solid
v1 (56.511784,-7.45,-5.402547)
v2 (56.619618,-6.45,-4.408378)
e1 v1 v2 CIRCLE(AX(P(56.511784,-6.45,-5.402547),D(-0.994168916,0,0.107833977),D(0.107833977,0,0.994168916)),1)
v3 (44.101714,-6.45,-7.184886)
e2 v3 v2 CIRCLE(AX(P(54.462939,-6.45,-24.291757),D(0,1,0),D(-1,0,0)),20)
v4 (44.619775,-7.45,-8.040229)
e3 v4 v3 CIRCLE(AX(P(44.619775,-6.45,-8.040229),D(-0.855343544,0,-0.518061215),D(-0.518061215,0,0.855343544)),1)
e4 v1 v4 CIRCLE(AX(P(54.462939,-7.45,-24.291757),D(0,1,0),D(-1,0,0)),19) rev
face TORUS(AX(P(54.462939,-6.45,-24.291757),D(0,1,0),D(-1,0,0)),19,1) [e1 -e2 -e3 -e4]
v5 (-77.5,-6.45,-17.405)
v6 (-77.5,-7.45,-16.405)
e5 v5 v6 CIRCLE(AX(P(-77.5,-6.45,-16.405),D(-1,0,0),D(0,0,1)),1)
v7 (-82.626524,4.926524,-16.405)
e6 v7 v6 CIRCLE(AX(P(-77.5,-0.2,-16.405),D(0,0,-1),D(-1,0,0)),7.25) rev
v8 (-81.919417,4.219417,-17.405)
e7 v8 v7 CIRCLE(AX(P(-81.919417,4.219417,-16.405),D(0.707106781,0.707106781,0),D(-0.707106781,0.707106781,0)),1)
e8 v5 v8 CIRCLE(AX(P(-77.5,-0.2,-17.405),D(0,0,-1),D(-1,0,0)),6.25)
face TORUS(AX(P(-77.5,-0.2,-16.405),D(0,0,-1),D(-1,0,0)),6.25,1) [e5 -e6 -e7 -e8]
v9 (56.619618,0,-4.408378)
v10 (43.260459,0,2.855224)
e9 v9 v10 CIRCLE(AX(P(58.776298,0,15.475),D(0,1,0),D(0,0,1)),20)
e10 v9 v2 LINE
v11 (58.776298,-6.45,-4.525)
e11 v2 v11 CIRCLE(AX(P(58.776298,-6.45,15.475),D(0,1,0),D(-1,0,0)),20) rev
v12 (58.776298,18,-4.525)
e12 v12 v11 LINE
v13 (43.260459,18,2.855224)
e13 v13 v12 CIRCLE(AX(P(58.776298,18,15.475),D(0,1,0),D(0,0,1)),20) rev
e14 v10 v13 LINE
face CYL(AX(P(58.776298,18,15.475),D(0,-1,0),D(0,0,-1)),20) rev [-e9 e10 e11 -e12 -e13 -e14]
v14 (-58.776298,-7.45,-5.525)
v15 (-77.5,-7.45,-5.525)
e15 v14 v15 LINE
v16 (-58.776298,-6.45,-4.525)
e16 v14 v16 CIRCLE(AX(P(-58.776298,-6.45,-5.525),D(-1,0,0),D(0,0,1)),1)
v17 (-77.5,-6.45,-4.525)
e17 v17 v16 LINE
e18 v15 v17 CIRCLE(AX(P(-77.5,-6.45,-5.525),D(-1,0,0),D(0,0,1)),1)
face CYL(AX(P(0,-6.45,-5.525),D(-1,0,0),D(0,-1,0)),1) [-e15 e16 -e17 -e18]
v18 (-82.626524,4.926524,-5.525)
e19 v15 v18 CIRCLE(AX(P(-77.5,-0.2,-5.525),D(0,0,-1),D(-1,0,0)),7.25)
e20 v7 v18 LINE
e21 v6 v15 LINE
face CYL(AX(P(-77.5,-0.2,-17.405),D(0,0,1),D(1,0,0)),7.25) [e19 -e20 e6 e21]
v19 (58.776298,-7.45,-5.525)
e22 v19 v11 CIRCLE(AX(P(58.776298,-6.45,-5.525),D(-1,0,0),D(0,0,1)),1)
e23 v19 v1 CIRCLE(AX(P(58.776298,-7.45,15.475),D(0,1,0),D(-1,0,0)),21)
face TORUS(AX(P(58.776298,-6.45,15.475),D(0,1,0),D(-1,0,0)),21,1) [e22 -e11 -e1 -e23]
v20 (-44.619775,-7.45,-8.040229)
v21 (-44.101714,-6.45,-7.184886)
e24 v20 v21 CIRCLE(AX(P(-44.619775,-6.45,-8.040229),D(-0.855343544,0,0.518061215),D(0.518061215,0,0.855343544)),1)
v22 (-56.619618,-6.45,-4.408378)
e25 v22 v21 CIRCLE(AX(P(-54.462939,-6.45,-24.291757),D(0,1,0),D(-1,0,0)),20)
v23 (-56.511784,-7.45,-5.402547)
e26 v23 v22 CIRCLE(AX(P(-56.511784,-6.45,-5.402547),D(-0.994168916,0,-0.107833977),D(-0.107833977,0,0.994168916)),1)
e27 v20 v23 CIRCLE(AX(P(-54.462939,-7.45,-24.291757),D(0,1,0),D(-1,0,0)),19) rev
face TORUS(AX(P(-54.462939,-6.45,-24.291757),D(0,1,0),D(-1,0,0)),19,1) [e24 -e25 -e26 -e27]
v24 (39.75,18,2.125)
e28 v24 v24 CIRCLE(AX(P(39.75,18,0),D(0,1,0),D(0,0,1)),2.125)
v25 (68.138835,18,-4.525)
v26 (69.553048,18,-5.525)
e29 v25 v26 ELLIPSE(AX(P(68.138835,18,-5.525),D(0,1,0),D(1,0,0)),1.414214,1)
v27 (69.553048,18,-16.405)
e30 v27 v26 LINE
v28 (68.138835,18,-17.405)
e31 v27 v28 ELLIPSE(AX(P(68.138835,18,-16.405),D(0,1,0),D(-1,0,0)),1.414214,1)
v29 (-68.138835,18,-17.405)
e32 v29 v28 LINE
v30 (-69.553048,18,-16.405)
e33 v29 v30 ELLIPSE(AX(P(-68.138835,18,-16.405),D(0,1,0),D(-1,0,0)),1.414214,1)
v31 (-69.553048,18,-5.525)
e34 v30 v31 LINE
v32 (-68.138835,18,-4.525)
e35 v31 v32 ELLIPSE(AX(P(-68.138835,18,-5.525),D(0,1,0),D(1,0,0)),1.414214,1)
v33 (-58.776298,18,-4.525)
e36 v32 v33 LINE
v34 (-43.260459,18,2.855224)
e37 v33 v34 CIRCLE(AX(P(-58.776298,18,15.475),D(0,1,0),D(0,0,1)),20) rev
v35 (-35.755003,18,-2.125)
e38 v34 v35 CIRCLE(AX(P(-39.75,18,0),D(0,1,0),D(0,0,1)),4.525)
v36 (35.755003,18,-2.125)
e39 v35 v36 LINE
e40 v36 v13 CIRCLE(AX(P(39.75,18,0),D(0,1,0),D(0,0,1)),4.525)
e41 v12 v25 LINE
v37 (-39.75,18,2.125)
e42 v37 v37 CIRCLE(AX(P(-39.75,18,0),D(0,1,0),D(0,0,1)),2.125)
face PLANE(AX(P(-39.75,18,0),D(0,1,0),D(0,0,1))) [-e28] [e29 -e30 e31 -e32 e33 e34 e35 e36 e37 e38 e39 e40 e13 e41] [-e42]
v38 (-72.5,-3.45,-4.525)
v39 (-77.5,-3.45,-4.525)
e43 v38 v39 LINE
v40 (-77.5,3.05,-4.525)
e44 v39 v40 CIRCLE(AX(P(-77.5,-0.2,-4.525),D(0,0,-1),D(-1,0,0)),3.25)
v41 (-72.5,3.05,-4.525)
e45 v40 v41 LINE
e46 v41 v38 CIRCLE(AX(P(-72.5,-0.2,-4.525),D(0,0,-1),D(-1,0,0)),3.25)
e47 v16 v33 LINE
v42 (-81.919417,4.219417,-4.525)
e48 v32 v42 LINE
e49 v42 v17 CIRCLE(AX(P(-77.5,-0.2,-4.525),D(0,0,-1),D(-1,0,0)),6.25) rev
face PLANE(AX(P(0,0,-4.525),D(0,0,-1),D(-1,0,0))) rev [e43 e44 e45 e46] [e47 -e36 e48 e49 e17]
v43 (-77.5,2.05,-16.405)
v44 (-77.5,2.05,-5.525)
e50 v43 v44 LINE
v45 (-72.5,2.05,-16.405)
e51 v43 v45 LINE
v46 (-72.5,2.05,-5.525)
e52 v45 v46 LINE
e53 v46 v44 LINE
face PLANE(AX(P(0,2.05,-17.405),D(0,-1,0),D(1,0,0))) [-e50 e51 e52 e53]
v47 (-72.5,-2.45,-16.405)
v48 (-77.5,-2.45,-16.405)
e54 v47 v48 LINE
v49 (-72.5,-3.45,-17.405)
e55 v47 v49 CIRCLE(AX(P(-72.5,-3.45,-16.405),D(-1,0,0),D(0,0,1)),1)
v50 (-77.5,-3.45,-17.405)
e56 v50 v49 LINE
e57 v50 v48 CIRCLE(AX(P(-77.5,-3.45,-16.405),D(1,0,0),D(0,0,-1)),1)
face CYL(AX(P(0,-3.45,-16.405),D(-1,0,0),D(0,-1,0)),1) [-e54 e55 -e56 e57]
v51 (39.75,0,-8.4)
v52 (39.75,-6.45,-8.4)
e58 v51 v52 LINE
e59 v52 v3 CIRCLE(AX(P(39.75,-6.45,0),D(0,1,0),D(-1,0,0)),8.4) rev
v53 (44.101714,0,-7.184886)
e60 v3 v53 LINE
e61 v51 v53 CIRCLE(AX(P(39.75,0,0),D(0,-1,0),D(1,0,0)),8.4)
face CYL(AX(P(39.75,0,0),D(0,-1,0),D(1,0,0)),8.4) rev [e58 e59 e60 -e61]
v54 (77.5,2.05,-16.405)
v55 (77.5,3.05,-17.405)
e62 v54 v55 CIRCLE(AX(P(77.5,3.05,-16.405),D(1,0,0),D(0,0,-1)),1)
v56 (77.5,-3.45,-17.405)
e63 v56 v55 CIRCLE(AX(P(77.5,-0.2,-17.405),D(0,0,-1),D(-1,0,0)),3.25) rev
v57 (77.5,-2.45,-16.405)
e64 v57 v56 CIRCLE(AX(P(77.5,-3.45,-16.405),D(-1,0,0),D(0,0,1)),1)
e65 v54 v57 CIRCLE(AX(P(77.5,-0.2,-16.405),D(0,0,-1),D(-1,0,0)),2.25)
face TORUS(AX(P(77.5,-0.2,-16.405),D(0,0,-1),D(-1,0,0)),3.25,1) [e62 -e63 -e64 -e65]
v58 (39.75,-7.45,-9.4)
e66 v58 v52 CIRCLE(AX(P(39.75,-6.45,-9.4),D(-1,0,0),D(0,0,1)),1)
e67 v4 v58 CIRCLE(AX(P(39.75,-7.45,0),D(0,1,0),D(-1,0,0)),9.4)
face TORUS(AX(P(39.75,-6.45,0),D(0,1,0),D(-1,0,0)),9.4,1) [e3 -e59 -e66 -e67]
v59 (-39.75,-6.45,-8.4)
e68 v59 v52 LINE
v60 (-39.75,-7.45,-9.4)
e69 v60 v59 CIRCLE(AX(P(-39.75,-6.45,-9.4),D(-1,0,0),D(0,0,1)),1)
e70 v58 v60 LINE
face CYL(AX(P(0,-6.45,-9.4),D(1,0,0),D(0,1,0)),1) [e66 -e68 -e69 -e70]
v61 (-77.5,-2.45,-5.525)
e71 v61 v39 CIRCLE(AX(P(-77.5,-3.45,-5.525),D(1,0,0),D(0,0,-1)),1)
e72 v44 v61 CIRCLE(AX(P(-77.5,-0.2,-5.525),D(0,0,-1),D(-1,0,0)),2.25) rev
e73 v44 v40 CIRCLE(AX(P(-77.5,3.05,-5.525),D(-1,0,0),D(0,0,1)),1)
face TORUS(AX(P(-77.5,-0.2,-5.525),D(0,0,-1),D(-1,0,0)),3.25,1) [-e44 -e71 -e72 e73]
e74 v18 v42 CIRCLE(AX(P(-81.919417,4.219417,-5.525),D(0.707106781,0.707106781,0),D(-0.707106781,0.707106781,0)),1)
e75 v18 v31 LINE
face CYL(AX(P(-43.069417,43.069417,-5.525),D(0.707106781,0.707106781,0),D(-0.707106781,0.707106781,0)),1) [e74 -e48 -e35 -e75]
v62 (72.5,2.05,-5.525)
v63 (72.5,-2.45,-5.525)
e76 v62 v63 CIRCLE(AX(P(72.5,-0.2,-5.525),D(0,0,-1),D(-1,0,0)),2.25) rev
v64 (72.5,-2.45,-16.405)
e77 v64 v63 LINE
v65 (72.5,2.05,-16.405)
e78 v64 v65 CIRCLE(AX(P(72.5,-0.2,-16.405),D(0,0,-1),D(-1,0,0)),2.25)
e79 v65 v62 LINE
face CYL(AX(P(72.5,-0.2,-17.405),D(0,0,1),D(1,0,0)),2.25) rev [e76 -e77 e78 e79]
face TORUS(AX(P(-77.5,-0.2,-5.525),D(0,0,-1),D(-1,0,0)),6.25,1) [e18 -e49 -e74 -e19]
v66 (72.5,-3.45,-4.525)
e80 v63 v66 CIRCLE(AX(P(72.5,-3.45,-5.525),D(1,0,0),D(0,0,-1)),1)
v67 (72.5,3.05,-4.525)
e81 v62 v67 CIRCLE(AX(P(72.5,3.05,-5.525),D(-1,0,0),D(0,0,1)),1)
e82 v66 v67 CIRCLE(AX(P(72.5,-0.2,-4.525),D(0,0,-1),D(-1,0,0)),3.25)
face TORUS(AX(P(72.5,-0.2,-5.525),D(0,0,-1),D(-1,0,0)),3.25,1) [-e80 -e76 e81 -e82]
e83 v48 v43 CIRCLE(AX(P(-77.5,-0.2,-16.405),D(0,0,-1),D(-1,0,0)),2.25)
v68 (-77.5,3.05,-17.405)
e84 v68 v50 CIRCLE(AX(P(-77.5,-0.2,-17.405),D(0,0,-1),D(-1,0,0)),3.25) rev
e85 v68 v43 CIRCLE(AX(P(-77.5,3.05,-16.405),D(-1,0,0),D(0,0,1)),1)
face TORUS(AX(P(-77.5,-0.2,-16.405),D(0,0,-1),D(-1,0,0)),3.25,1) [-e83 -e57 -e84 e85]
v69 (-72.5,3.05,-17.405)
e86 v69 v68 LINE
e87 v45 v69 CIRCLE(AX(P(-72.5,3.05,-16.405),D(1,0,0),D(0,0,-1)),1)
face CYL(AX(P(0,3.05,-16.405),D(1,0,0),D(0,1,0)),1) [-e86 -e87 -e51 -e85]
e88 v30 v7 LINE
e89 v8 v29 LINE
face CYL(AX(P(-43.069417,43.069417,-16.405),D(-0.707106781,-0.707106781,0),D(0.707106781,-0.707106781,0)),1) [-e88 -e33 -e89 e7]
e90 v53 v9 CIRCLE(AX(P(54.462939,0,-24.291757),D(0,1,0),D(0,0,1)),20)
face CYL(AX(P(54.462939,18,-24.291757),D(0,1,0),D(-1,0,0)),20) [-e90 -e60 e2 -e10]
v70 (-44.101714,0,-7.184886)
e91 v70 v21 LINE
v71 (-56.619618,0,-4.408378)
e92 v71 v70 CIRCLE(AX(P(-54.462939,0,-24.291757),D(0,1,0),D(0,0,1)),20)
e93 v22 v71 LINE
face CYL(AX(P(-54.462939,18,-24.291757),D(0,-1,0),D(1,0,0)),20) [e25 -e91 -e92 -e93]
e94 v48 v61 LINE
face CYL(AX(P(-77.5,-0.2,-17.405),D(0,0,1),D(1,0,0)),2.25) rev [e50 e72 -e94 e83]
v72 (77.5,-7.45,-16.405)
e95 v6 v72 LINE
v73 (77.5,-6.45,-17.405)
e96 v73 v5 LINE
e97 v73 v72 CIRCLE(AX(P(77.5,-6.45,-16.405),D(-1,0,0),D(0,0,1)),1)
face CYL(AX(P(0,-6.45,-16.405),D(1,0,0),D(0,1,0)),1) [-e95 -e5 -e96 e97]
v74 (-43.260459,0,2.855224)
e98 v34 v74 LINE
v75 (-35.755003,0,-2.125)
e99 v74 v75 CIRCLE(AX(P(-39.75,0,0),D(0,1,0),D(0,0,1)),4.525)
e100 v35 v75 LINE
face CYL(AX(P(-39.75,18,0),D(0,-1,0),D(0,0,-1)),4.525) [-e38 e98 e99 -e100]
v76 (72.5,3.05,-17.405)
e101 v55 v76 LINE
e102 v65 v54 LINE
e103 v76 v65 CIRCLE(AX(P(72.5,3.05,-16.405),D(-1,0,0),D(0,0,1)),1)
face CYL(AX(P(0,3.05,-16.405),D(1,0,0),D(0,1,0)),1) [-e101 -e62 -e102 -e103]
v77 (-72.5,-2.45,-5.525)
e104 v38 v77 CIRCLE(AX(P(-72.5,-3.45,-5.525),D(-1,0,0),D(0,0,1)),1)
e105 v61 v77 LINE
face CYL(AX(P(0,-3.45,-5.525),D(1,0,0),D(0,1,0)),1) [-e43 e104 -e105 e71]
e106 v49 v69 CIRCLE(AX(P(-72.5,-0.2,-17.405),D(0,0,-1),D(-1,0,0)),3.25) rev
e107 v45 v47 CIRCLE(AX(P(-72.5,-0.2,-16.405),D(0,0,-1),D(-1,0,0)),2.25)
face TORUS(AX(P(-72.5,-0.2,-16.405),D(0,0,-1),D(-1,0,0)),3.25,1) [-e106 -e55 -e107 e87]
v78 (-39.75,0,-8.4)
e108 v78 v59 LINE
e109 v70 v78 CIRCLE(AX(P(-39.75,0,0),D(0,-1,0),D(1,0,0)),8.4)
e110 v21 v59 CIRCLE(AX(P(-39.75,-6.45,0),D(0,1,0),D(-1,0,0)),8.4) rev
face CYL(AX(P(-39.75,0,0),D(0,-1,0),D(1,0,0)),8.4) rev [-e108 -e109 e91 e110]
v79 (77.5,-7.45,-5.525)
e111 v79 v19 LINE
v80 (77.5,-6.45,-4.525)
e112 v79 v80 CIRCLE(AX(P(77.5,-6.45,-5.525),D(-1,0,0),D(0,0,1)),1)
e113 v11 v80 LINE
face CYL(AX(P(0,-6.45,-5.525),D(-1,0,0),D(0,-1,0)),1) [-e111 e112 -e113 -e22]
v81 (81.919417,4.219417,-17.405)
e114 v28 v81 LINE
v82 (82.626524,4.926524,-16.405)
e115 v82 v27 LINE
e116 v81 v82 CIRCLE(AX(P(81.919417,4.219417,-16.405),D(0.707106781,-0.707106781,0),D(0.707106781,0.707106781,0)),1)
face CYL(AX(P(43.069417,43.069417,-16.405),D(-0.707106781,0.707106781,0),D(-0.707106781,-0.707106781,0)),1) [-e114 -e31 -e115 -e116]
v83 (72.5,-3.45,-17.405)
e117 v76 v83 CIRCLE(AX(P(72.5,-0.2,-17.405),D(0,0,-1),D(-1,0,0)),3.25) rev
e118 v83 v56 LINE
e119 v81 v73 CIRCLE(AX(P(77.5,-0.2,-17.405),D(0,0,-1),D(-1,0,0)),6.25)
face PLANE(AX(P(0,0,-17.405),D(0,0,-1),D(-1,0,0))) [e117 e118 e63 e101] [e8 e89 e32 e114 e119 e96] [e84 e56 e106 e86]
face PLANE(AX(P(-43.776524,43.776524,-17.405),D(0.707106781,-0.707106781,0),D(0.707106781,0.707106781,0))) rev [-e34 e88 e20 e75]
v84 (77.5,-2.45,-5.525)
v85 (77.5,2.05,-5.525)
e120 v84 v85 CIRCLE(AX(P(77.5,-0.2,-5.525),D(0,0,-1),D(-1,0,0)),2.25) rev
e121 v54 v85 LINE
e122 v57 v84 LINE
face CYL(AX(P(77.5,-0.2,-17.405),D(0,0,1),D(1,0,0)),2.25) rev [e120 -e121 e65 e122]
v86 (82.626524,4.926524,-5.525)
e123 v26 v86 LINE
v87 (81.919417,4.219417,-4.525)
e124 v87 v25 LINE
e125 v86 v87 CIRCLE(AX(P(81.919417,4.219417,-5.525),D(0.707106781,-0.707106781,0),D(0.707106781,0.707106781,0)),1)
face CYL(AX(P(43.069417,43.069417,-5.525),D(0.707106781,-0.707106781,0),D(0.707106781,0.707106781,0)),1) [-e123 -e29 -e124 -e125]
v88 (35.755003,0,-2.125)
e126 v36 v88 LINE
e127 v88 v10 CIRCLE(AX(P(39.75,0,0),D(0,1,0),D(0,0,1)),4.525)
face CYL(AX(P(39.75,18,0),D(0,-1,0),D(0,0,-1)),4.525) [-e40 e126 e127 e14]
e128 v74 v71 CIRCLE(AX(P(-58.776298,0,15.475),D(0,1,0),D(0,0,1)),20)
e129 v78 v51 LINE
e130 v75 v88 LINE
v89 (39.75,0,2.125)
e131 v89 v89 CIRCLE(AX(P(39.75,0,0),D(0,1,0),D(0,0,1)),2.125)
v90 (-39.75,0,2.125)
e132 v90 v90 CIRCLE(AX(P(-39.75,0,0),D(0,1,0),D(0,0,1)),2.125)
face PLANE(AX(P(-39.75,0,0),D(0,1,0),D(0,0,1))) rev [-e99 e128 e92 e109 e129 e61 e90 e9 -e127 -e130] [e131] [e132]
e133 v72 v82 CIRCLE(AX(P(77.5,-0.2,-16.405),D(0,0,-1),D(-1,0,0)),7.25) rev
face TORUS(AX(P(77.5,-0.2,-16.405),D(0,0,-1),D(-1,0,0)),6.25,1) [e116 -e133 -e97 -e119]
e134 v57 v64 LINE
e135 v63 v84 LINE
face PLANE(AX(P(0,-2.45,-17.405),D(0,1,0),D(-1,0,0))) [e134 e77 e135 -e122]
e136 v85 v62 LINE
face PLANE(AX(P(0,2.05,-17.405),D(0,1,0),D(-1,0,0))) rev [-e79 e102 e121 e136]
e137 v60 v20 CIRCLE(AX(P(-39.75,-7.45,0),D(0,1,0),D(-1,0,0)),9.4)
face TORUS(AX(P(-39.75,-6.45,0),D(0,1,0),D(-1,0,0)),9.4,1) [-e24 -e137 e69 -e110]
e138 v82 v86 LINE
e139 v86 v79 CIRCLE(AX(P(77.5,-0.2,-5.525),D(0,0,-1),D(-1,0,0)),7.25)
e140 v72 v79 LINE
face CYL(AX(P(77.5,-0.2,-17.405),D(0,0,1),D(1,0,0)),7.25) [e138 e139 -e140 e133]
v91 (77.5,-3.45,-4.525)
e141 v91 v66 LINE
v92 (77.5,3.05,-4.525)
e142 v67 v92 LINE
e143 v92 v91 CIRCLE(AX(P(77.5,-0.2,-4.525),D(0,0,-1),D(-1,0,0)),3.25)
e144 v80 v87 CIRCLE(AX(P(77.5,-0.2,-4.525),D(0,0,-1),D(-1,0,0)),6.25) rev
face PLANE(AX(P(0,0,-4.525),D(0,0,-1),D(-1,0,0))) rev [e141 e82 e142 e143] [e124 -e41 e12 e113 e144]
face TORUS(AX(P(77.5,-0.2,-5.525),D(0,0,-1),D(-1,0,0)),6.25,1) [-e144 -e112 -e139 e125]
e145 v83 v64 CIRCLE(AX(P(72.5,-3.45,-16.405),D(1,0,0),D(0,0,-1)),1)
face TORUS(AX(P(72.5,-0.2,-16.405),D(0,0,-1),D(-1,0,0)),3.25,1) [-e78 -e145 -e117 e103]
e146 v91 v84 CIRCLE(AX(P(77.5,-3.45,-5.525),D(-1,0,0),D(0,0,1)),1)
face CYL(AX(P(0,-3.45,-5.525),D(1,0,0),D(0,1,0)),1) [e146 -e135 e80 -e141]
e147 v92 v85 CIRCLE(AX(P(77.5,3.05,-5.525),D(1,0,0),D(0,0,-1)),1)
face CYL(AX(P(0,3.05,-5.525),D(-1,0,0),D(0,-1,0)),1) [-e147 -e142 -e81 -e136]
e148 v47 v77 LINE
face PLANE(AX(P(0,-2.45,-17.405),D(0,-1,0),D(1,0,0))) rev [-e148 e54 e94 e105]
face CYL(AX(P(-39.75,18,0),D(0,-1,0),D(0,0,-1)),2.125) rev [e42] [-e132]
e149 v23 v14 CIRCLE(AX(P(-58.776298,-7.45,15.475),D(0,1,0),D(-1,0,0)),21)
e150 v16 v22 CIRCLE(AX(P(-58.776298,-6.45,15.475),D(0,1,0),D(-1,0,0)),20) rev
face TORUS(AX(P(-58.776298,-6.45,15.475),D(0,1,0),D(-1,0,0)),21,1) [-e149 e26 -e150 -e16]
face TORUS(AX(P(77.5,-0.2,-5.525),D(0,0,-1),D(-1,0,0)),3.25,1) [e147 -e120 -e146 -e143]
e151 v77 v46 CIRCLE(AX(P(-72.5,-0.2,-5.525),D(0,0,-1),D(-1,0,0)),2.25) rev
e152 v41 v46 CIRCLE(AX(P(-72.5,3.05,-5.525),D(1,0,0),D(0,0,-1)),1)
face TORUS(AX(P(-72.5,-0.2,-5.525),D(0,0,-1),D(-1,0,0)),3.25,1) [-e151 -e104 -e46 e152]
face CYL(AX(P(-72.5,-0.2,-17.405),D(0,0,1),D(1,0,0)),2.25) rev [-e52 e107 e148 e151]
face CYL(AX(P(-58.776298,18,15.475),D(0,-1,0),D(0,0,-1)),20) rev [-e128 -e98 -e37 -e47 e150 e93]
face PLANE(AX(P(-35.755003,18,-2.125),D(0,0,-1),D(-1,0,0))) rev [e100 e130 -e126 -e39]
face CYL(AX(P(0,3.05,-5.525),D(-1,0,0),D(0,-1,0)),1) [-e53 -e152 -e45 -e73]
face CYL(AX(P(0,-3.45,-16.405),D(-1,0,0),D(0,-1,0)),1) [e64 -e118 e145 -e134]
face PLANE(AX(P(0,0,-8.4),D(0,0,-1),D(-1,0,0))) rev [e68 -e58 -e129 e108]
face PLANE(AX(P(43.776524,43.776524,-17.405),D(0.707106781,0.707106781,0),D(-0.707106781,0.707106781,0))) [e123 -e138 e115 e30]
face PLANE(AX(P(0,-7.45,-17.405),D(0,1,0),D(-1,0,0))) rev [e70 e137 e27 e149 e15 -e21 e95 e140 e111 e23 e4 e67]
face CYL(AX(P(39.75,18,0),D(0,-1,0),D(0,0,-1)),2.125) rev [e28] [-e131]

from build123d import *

# Parameters (mm, degrees)
SKETCH1_R                 = 2.125
MAIN_DEPTH                = 18
POWE_SUPPLY_MOUNT_DEPTH   = 12.88
BOTTOM_PLATE_CAVITY_DEPTH = 7.45
FILLET1_DEPTH             = 18
FILLET1_START             = -7.45
FILLET1_2_DEPTH           = 9.35116
FILLET2_R                 = 20
FILLET3_R                 = 1


with BuildPart() as part:
    # Sketch1 → Main (new body)
    with BuildSketch(Plane(origin=(0, 0, 0), x_dir=(1, 0, 0), z_dir=(0, 1, 0))):
        with BuildLine():
            Line((-39.75, 4.525), (39.75, 4.525))
            ThreePointArc((39.75, 4.525), (42.08023604, -3.878869036), (35.755003129, 2.125))
            Line((35.755003129, 2.125), (-35.755003129, 2.125))
            ThreePointArc((-35.755003129, 2.125), (-42.08023604, -3.878869036), (-39.75, 4.525))
        make_face()
        with Locations(Location((-39.75, 0, 0), (0, 0, 270))):
            Circle(SKETCH1_R, mode=Mode.SUBTRACT)
        with Locations(Location((39.75, 0, 0), (0, 0, 270))):
            Circle(SKETCH1_R, mode=Mode.SUBTRACT)
    extrude(amount=MAIN_DEPTH)

    # Sketch2 → Powe Supply Mount (add)
    with BuildSketch(Plane(origin=(0, 0, -4.525), x_dir=(-1, 0, 0), z_dir=(0, 0, -1))):
        with BuildLine():
            Line((-69.553048327, 18), (-82.626524164, 4.926524164))
            ThreePointArc((-82.626524164, 4.926524164), (-84.198126611, -2.974454885), (-77.5, -7.45))
            Line((-77.5, -7.45), (77.5, -7.45))
            ThreePointArc((77.5, -7.45), (84.198126611, -2.974454885), (82.626524164, 4.926524164))
            Line((82.626524164, 4.926524164), (69.553048327, 18))
            Line((69.553048327, 18), (-69.553048327, 18))
        make_face()
        with BuildLine():
            Line((77.5, -2.45), (72.5, -2.45))
            ThreePointArc((72.5, -2.45), (70.25, -0.2), (72.5, 2.05))
            Line((72.5, 2.05), (77.5, 2.05))
            ThreePointArc((77.5, 2.05), (79.75, -0.2), (77.5, -2.45))
        make_face(mode=Mode.SUBTRACT)
        with BuildLine():
            ThreePointArc((-77.5, -2.45), (-79.75, -0.2), (-77.5, 2.05))
            Line((-77.5, 2.05), (-72.5, 2.05))
            ThreePointArc((-72.5, 2.05), (-70.25, -0.2), (-72.5, -2.45))
            Line((-72.5, -2.45), (-77.5, -2.45))
        make_face(mode=Mode.SUBTRACT)
    extrude(amount=POWE_SUPPLY_MOUNT_DEPTH)

    # Sketch4 → Bottom Plate Cavity (cut)
    with BuildSketch(Plane.XZ.offset(7.45)):
        with BuildLine():
            ThreePointArc((-46.82703151, -4.525), (-43.784228551, -7.367835503), (-39.75, -8.4))
            Line((-39.75, -8.4), (39.75, -8.4))
            ThreePointArc((39.75, -8.4), (43.784228551, -7.367835503), (46.82703151, -4.525))
            Line((46.82703151, -4.525), (-46.82703151, -4.525))
        make_face()
    extrude(amount=-BOTTOM_PLATE_CAVITY_DEPTH, mode=Mode.SUBTRACT)

    # Fillet1: read off the stored shape, not the designer's step
    # Fillet1 outline → Fillet1 (add)
    with BuildSketch(Plane(origin=(0, 0, 0), x_dir=(1, 0, 0), z_dir=(0, 1, 0))):
        with BuildLine():
            ThreePointArc((-58.77629759, 4.525), (-50.185474428, 2.585945639), (-43.260458577, -2.855224261))
            ThreePointArc((-43.260458577, -2.855224261), (-43.836288951, 1.943673741), (-39.75, 4.525))
            Line((-39.75, 4.525), (-58.77629759, 4.525))
        make_face()
        with BuildLine():
            Line((58.77629759, 4.525), (39.75, 4.525))
            ThreePointArc((39.75, 4.525), (43.836288951, 1.943673741), (43.260458577, -2.855224261))
            ThreePointArc((43.260458577, -2.855224261), (50.185474428, 2.585945639), (58.77629759, 4.525))
        make_face()
    extrude(amount=FILLET1_DEPTH)

    # Fillet1 2 outline → Fillet1 2 (add)
    with BuildSketch(Plane(origin=(0, 0, 0), x_dir=(1, 0, 0), z_dir=(0, 1, 0)).offset(FILLET1_START)):
        with BuildLine():
            ThreePointArc((-58.77629759, 4.525), (-53.181472877, 3.726508701), (-48.033390049, 1.394793642))
            ThreePointArc((-48.033390049, 1.394793642), (-47.588060064, 3.020730777), (-46.82703151, 4.525))
            Line((-46.82703151, 4.525), (-58.77629759, 4.525))
        make_face()
        with BuildLine():
            Line((58.77629759, 4.525), (46.82703151, 4.525))
            ThreePointArc((46.82703151, 4.525), (47.588060064, 3.020730777), (48.033390048, 1.394793643))
            ThreePointArc((48.033390048, 1.394793643), (53.181472877, 3.726508701), (58.77629759, 4.525))
        make_face()
    extrude(amount=FILLET1_2_DEPTH)

    # Fillet2
    # the kernel refuses this fillet: 20 mm, written as the material it takes off along each edge
    with BuildSketch(Plane(origin=(-48.033390049, -30.199313713, -1.394793642), x_dir=(-0.9435700028577678, 0, -0.33117314158456784), z_dir=(0, 1, 0))) as fillet2_piece_1:
        with BuildLine():
            CenterArc((13.649588228, -19.475593676), FILLET2_R, 103.14952704, 37.392760126)
            ThreePointArc((-1.79228839, -6.765422689), (-0.157980704, -3.57826481), (0, 0))
            ThreePointArc((0, 0), (4.549862743, -0.524406324), (9.099725485, 0))
        make_face()
    extrude(amount=30.199313713, mode=Mode.SUBTRACT)
    with BuildSketch(Plane(origin=(48.033390048, -30.199313709, -1.394793643), x_dir=(0.9435700028837163, 0, -0.3311731415106358), z_dir=(0, 1, 0))) as fillet2_piece_2:
        with BuildLine():
            CenterArc((13.649588223, 19.475593677), FILLET2_R, 219.457712868, 37.392760103)
            ThreePointArc((-1.792288388, 6.76542268), (-0.157980703, 3.578264806), (0, 0))
            ThreePointArc((0, 0), (4.549862742, 0.524406323), (9.099725484, 0))
        make_face()
    extrude(amount=30.199313709, mode=Mode.SUBTRACT)

    # Fillet3
    fillet3_edges = [part.edges().sort_by_distance(p)[0] for p in [
        (-42.009088261, -7.45, -8.090520393),
        (-57.696382402, -7.45, -4.495823297),
        (50.13213176, -7.45, -4.7662832),
        (-50.132131759, -7.45, -4.766283202),
        (-70.25, -0.2, -17.405),
        (-75, 2.05, -17.405),
        (-79.75, -0.2, -17.405),
        (70.25, -0.2, -17.405),
        (75, -2.45, -17.405),
        (79.75, -0.2, -17.405),
        (76.089786245, 11.463262082, -17.405),
        (84.198126611, -2.974454885, -4.525),
        (68.138148795, -7.45, -4.525),
        (-84.198126611, -2.974454885, -4.525),
        (75, 2.05, -4.525),
        (-76.089786245, 11.463262082, -4.525),
        (-75, -2.45, -4.525),
        (84.198126611, -2.974454885, -17.405),
        (0, -7.45, -17.405),
        (-84.198126611, -2.974454885, -17.405),
        (-76.089786245, 11.463262082, -17.405),
        (75, 2.05, -17.405),
        (-75, -2.45, -17.405),
        (76.089786245, 11.463262082, -4.525),
        (70.25, -0.2, -4.525),
        (79.75, -0.2, -4.525),
        (75, -2.45, -4.525),
        (-70.25, -0.2, -4.525),
        (-79.75, -0.2, -4.525),
        (-75, 2.05, -4.525),
        (0, -7.45, -8.4),
        (42.009088264, -7.45, -8.090520392),
        (-68.138148795, -7.45, -4.525),
        (57.696382401, -7.45, -4.495823297),
    ]]
    fillet(fillet3_edges, radius=FILLET3_R)


solid = part.part
